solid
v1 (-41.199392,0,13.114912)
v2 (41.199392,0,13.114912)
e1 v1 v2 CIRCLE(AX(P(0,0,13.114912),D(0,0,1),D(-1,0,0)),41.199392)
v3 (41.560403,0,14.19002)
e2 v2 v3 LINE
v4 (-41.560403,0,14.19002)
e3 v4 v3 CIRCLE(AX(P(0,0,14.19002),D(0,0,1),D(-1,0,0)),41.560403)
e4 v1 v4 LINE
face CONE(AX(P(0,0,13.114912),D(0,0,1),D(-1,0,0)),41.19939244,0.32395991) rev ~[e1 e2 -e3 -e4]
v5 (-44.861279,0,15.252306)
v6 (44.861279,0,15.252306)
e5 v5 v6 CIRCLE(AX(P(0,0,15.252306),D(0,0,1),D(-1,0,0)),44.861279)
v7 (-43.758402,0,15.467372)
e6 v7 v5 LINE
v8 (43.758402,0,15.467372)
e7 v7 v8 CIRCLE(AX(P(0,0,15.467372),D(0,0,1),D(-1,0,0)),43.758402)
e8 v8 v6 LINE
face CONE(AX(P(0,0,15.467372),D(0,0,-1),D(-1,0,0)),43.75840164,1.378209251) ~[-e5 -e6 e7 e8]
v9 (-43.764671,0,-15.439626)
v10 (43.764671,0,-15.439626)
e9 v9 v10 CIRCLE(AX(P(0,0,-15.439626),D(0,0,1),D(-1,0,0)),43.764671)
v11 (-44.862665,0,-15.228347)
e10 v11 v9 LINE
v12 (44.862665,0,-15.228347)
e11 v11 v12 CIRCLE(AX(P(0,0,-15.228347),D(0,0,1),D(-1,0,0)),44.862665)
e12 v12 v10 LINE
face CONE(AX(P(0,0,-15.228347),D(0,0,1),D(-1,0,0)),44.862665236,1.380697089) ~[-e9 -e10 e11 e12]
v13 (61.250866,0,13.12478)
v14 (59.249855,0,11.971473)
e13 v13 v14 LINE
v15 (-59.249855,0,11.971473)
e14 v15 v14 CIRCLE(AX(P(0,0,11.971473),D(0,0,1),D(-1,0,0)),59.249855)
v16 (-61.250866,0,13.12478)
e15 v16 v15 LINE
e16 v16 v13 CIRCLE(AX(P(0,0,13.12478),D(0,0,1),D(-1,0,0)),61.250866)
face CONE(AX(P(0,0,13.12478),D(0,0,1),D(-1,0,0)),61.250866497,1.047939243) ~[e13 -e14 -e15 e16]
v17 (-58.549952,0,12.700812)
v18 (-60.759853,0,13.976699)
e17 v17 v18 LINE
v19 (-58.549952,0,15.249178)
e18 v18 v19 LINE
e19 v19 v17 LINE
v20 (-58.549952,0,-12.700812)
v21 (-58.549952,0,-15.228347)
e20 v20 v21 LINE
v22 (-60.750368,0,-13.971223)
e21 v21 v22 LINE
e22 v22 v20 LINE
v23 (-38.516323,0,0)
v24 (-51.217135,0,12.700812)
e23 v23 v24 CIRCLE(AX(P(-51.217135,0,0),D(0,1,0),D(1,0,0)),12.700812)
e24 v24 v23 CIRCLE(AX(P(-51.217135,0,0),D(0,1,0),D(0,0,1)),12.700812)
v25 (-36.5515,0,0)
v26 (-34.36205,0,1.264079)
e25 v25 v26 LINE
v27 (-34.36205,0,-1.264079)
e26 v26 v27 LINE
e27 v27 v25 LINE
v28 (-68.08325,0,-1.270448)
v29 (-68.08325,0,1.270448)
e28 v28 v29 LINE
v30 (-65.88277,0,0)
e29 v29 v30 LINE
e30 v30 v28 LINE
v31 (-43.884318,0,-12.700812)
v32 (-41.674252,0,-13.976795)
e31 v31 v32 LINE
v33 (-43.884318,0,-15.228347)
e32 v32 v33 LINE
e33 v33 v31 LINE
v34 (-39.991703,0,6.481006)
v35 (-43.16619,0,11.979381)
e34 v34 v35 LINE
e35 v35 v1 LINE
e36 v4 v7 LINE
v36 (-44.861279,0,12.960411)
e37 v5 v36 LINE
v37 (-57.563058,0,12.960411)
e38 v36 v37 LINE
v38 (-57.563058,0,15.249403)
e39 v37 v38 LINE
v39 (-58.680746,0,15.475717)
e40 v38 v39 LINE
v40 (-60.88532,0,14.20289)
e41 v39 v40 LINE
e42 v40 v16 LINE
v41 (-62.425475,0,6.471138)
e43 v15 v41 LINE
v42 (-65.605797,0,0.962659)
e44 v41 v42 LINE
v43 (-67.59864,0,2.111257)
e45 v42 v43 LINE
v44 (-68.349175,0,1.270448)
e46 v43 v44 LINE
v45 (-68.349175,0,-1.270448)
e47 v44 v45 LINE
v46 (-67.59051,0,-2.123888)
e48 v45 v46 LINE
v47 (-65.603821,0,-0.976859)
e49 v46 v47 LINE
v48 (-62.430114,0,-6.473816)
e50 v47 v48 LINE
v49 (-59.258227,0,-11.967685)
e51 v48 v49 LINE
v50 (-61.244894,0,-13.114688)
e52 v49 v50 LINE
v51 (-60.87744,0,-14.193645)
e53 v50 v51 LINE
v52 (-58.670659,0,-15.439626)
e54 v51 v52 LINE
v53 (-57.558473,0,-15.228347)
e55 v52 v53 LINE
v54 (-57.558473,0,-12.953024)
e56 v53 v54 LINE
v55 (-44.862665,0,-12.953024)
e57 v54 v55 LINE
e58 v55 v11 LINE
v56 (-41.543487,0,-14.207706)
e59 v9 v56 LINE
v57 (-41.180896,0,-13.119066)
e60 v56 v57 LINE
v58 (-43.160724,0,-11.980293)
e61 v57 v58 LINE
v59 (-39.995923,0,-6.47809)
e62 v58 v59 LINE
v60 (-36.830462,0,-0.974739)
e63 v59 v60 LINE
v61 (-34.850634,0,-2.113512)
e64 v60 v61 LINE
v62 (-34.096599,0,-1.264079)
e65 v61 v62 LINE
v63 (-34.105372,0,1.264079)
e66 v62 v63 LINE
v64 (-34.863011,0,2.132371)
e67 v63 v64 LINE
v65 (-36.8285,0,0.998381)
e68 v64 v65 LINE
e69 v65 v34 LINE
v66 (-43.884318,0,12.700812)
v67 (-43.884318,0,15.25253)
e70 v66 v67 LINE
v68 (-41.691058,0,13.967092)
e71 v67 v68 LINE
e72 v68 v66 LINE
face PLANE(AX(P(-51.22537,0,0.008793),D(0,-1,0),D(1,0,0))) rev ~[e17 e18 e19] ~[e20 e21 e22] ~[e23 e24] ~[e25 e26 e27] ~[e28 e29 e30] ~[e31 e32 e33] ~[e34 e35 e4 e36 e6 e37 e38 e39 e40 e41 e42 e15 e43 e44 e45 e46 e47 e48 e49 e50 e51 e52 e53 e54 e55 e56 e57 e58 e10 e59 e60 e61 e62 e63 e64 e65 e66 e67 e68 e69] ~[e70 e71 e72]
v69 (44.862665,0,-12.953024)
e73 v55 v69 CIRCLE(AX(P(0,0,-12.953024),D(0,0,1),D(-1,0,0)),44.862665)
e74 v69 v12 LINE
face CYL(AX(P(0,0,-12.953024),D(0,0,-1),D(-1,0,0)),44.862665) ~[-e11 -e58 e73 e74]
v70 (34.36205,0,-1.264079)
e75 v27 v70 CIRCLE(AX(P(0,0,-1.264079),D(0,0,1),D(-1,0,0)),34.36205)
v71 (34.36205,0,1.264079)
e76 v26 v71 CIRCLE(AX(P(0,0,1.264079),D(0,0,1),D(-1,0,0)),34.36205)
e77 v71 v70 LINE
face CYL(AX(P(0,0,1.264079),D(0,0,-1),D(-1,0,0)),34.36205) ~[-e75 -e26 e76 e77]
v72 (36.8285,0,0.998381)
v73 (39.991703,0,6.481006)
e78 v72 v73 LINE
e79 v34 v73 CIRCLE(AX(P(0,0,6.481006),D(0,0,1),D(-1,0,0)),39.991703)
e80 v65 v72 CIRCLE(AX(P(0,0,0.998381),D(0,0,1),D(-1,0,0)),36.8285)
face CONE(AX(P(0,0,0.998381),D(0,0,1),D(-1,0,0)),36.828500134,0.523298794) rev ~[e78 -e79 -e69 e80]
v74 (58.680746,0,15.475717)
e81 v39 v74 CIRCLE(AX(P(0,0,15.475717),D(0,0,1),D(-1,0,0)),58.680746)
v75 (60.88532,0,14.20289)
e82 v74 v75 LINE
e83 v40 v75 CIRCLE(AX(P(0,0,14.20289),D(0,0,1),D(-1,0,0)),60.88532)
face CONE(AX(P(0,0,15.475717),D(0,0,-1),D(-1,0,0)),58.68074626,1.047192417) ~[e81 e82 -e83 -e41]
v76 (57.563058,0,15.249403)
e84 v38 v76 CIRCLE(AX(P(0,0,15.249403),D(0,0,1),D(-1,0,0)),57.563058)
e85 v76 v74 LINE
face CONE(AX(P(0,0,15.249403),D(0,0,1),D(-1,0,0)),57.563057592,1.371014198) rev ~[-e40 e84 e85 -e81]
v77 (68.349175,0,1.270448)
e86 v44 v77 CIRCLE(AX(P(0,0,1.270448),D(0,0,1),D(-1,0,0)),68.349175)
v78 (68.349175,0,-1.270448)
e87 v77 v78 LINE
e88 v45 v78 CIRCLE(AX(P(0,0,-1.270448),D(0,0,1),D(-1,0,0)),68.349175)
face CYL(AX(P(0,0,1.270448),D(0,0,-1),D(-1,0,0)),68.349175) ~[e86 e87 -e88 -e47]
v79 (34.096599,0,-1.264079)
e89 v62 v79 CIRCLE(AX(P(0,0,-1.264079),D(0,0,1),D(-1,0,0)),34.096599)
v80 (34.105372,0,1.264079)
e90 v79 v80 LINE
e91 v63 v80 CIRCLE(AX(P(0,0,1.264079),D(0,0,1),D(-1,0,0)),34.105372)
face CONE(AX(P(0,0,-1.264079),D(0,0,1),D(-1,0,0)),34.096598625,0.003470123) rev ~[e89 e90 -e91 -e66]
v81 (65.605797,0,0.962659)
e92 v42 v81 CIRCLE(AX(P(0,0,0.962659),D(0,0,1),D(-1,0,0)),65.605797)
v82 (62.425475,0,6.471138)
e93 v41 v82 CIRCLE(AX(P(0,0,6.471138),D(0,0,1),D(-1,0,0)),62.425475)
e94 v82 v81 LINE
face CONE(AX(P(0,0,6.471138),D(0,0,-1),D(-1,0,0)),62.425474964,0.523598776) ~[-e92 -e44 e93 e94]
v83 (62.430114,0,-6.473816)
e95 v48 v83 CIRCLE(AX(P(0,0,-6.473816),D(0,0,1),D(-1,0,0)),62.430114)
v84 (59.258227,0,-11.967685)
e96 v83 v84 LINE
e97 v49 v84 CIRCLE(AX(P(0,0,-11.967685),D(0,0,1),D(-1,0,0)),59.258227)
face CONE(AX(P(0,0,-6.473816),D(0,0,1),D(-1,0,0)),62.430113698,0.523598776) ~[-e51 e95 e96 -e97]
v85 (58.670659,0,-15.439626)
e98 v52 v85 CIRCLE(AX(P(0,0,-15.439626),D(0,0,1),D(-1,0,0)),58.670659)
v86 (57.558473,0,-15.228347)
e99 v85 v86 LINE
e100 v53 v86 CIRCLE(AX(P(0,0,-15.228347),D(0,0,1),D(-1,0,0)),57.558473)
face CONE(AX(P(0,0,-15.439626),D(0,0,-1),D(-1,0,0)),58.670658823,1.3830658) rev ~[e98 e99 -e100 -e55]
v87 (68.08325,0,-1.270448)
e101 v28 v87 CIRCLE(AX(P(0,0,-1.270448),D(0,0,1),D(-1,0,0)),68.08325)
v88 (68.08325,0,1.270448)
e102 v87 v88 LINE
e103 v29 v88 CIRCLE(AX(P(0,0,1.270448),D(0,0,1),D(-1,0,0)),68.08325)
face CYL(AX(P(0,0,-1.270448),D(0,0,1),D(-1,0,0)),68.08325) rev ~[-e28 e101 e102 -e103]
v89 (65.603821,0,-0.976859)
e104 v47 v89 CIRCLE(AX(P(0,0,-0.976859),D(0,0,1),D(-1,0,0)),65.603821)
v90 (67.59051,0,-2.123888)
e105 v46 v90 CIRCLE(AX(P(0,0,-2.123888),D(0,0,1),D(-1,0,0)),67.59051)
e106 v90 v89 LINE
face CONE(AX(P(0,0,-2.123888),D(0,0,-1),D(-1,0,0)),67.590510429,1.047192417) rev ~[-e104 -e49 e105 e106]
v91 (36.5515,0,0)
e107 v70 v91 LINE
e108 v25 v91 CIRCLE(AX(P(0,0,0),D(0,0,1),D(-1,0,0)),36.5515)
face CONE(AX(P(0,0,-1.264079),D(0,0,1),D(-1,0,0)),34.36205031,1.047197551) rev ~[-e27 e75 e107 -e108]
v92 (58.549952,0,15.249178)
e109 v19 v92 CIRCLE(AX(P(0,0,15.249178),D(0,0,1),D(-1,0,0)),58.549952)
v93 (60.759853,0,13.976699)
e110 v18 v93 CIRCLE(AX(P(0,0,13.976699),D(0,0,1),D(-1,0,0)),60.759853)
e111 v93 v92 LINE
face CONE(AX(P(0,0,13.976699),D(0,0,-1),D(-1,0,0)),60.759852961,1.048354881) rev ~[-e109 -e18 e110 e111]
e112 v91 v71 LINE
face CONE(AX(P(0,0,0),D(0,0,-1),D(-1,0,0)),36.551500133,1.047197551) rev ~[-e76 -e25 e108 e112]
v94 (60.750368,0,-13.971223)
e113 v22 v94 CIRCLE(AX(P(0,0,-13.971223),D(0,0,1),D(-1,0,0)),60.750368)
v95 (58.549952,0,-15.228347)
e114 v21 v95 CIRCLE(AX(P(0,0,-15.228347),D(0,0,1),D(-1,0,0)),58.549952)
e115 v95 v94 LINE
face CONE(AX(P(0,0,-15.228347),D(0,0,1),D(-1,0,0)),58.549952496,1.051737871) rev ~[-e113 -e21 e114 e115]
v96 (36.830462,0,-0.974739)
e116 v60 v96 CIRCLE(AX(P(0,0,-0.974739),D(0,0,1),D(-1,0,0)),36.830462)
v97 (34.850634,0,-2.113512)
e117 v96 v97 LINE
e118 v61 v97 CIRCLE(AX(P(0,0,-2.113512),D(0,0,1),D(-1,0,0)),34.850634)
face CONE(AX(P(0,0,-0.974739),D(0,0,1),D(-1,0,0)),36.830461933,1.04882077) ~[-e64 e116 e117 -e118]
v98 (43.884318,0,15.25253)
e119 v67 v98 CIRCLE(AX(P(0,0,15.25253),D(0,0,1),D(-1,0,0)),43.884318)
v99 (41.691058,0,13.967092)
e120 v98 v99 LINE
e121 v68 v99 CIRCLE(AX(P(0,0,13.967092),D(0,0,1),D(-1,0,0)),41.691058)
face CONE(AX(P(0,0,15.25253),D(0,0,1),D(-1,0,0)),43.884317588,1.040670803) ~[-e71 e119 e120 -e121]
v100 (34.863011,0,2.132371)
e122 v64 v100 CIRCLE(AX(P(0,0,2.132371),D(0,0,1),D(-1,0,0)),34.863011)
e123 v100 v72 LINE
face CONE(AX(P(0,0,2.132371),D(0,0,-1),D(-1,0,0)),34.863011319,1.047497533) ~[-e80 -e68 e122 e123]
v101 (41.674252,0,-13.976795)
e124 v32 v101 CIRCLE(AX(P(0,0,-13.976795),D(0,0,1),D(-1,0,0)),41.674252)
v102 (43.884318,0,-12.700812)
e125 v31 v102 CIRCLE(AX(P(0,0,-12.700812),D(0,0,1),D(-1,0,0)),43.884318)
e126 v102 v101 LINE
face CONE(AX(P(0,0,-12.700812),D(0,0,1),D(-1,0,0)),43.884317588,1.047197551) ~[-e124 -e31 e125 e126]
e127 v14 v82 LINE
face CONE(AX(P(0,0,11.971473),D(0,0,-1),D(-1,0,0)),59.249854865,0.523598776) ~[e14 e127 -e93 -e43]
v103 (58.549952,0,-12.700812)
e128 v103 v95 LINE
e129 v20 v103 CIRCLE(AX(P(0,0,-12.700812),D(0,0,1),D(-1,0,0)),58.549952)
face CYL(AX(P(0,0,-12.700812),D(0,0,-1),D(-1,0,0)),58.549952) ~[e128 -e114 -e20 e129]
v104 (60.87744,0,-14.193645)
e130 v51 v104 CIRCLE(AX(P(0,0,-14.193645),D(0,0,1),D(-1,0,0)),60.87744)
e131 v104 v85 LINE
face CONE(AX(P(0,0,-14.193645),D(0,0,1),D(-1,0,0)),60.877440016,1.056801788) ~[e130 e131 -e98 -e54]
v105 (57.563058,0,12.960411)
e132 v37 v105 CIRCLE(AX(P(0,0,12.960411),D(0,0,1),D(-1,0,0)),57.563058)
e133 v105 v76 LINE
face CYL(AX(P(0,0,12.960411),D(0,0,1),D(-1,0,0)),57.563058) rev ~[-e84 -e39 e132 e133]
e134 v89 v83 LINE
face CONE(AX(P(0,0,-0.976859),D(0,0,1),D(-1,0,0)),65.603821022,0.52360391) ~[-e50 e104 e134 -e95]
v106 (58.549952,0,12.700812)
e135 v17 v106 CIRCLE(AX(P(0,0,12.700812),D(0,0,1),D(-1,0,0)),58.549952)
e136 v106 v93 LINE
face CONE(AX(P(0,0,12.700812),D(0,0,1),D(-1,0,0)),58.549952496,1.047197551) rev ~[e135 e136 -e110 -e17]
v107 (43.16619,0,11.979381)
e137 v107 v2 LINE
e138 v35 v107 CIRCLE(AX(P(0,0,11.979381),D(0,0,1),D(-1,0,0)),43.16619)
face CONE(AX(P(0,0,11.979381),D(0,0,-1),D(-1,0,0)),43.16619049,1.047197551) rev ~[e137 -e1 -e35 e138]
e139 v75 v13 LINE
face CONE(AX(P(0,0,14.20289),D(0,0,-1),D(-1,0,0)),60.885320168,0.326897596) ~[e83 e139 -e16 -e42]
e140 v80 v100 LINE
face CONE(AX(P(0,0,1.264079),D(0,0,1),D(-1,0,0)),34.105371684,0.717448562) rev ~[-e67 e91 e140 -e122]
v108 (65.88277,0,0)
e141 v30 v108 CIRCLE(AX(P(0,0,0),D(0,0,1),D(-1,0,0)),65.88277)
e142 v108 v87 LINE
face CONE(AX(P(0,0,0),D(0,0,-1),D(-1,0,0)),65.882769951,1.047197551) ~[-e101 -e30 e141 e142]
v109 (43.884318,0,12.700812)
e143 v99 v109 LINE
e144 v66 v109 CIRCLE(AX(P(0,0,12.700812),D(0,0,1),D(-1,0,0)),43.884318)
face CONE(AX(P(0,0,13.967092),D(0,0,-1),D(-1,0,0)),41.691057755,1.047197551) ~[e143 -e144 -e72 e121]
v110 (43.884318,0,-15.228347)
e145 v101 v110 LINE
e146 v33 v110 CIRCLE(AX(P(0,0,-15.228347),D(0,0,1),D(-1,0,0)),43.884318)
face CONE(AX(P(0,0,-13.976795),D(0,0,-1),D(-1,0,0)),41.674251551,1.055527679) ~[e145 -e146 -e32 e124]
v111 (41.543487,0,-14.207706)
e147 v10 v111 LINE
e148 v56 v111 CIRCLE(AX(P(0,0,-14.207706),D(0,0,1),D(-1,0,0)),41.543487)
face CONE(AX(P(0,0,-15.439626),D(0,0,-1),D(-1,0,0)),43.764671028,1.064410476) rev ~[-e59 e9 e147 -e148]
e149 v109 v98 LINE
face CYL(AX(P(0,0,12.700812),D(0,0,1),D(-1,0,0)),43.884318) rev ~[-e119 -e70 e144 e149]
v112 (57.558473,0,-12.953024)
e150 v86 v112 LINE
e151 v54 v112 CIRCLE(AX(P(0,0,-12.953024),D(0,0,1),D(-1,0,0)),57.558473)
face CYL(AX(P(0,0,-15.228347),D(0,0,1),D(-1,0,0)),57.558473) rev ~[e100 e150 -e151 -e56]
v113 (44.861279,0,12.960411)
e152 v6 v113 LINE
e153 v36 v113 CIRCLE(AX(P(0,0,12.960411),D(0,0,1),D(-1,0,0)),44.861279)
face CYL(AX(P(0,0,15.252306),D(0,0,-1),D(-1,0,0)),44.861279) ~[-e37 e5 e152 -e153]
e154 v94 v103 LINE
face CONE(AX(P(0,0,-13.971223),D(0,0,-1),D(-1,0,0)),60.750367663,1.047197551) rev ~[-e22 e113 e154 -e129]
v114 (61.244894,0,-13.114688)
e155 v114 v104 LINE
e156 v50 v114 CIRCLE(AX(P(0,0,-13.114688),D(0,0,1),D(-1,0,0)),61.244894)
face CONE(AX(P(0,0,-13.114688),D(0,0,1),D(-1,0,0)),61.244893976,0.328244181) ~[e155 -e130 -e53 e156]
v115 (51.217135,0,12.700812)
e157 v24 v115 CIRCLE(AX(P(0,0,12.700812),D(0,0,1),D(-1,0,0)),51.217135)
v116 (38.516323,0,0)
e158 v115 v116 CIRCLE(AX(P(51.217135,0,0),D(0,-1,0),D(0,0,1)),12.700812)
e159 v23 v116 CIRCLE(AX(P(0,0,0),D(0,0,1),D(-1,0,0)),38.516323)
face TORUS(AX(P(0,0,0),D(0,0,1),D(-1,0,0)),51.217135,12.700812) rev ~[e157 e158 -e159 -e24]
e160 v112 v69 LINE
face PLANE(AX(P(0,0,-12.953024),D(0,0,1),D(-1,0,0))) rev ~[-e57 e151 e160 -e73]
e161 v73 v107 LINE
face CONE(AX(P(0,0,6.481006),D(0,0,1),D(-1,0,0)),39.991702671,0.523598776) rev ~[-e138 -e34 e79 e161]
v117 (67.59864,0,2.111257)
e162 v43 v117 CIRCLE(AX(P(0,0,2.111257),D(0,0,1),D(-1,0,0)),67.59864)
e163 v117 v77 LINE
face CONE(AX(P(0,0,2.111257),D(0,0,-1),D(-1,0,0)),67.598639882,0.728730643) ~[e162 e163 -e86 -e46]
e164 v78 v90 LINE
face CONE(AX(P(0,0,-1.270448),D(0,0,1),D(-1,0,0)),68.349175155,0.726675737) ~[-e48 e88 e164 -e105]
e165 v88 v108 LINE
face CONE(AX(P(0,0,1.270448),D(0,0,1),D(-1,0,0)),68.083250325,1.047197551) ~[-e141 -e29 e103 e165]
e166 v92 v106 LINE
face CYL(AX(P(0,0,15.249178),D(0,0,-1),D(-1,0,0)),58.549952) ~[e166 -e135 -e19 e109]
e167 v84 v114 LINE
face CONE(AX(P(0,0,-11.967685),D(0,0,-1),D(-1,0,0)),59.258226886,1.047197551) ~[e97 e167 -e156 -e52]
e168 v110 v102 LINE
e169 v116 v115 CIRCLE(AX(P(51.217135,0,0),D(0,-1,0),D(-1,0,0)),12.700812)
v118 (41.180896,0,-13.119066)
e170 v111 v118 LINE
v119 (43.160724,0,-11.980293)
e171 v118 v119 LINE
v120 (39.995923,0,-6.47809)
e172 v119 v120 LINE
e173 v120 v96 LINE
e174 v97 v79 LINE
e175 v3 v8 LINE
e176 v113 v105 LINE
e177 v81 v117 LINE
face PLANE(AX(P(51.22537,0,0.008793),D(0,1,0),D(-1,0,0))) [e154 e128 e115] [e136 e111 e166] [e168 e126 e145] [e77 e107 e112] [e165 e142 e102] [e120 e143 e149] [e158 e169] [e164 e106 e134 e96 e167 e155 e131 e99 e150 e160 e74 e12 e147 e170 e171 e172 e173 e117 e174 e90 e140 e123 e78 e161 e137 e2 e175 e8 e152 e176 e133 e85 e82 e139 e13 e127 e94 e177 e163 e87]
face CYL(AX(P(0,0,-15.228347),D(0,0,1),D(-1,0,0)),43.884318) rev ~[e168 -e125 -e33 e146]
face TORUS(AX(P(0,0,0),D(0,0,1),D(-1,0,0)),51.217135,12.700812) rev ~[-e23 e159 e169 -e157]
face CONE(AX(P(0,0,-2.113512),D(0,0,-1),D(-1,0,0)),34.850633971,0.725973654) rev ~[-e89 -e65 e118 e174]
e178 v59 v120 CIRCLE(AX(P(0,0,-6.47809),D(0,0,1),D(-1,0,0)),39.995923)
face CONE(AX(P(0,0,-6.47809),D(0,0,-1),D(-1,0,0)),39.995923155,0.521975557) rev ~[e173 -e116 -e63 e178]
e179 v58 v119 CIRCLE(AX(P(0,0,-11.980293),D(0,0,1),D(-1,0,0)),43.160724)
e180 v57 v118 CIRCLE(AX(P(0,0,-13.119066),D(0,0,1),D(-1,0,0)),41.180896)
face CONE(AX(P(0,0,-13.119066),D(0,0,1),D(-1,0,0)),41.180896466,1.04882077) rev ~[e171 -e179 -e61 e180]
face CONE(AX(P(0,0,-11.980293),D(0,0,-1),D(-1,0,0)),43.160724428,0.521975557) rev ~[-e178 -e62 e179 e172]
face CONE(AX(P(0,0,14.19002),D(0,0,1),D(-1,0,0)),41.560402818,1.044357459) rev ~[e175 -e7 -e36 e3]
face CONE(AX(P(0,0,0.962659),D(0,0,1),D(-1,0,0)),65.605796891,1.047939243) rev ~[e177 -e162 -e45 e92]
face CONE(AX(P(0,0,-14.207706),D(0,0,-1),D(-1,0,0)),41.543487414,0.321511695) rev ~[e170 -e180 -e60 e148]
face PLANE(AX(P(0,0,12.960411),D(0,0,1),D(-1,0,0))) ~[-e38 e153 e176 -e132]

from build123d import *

# Parameters (mm, degrees)
F2_ANGLE = 180


with BuildPart() as f2:
    # F1 (on Front) → F2 (revolve)
    with BuildSketch(Plane.XZ):
        Polygon((-44.861279428, 12.9604106769), (-51.217135042, 12.9604106769), (-57.5630575919, 12.9604106769), (-57.5630575919, 15.2494033683), (-58.6807462598, 15.475716571), (-60.8853201683, 14.20289014), (-61.2508664965, 13.1247800337), (-59.2498548651, 11.9714734282), (-62.425474964, 6.4711380712), (-65.6057968908, 0.9626589096), (-67.5986398816, 2.1112574229), (-68.3491751552, 1.2704479365), (-68.3491751552, -1.2704479365), (-67.590510429, -2.1238883528), (-65.6038210217, -0.9768590888), (-62.4301136979, -6.4738162454), (-59.2582268861, -11.9676853595), (-61.244893976, -13.1146881387), (-60.8774400163, -14.19364456), (-58.6706588228, -15.4396259846), (-57.5584731996, -15.2283469215), (-57.5584731996, -12.9530243576), (-51.217135042, -12.9530243576), (-44.862665236, -12.9530243576), (-44.862665236, -15.2283469215), (-43.7646710275, -15.4396259846), (-41.5434874137, -14.2077057619), (-41.1808964662, -13.1190662144), (-43.1607244284, -11.9802929242), (-39.9959231548, -6.4780897113), (-36.8304619331, -0.9747391376), (-34.850633971, -2.1135124278), (-34.0965986252, -1.2640794445), (-34.1053716838, 1.2640794445), (-34.8630113186, 2.1323707922), (-36.8285001335, 0.9983813071), (-39.9917026714, 6.4810064009), (-43.1661904902, 11.9793805911), (-41.19939244, 13.1149119748), (-41.5604028179, 14.1900196116), (-43.7584016402, 15.4673718757), (-44.861279428, 15.2523063589), align=None)
        Polygon((-60.7503676631, -13.9712226825), (-58.5499524964, -12.7008123937), (-58.5499524964, -15.2283469215), align=None, mode=Mode.SUBTRACT)
        Polygon((-68.0832503253, 1.2704479365), (-65.8827699508, 0), (-68.0832503253, -1.2704479365), align=None, mode=Mode.SUBTRACT)
        Polygon((-43.8843175875, -15.2283469215), (-43.8843175875, -12.7008123937), (-41.6742515512, -13.9767946147), align=None, mode=Mode.SUBTRACT)
        with BuildLine():
            ThreePointArc((-51.217135042, 12.7008123937), (-42.2363044718, 8.9808305702), (-38.5163226482, 0))
            ThreePointArc((-38.5163226482, 0), (-60.1979656121, -8.9808305702), (-51.217135042, 12.7008123937))
        make_face(mode=Mode.SUBTRACT)
        Polygon((-34.3620503103, -1.2640794445), (-36.5515001331, 0), (-34.3620503103, 1.2640794445), align=None, mode=Mode.SUBTRACT)
        Polygon((-58.5499524964, 15.2491778135), (-58.5499524964, 12.7008123937), (-60.7598529608, 13.9766990217), align=None, mode=Mode.SUBTRACT)
        Polygon((-41.6910577545, 13.9670915487), (-43.8843175875, 12.7008123937), (-43.8843175875, 15.2525296435), align=None, mode=Mode.SUBTRACT)
    revolve(axis=Axis((0, 0, 0), (0, 0, 1)), revolution_arc=F2_ANGLE)


solid = f2.part
